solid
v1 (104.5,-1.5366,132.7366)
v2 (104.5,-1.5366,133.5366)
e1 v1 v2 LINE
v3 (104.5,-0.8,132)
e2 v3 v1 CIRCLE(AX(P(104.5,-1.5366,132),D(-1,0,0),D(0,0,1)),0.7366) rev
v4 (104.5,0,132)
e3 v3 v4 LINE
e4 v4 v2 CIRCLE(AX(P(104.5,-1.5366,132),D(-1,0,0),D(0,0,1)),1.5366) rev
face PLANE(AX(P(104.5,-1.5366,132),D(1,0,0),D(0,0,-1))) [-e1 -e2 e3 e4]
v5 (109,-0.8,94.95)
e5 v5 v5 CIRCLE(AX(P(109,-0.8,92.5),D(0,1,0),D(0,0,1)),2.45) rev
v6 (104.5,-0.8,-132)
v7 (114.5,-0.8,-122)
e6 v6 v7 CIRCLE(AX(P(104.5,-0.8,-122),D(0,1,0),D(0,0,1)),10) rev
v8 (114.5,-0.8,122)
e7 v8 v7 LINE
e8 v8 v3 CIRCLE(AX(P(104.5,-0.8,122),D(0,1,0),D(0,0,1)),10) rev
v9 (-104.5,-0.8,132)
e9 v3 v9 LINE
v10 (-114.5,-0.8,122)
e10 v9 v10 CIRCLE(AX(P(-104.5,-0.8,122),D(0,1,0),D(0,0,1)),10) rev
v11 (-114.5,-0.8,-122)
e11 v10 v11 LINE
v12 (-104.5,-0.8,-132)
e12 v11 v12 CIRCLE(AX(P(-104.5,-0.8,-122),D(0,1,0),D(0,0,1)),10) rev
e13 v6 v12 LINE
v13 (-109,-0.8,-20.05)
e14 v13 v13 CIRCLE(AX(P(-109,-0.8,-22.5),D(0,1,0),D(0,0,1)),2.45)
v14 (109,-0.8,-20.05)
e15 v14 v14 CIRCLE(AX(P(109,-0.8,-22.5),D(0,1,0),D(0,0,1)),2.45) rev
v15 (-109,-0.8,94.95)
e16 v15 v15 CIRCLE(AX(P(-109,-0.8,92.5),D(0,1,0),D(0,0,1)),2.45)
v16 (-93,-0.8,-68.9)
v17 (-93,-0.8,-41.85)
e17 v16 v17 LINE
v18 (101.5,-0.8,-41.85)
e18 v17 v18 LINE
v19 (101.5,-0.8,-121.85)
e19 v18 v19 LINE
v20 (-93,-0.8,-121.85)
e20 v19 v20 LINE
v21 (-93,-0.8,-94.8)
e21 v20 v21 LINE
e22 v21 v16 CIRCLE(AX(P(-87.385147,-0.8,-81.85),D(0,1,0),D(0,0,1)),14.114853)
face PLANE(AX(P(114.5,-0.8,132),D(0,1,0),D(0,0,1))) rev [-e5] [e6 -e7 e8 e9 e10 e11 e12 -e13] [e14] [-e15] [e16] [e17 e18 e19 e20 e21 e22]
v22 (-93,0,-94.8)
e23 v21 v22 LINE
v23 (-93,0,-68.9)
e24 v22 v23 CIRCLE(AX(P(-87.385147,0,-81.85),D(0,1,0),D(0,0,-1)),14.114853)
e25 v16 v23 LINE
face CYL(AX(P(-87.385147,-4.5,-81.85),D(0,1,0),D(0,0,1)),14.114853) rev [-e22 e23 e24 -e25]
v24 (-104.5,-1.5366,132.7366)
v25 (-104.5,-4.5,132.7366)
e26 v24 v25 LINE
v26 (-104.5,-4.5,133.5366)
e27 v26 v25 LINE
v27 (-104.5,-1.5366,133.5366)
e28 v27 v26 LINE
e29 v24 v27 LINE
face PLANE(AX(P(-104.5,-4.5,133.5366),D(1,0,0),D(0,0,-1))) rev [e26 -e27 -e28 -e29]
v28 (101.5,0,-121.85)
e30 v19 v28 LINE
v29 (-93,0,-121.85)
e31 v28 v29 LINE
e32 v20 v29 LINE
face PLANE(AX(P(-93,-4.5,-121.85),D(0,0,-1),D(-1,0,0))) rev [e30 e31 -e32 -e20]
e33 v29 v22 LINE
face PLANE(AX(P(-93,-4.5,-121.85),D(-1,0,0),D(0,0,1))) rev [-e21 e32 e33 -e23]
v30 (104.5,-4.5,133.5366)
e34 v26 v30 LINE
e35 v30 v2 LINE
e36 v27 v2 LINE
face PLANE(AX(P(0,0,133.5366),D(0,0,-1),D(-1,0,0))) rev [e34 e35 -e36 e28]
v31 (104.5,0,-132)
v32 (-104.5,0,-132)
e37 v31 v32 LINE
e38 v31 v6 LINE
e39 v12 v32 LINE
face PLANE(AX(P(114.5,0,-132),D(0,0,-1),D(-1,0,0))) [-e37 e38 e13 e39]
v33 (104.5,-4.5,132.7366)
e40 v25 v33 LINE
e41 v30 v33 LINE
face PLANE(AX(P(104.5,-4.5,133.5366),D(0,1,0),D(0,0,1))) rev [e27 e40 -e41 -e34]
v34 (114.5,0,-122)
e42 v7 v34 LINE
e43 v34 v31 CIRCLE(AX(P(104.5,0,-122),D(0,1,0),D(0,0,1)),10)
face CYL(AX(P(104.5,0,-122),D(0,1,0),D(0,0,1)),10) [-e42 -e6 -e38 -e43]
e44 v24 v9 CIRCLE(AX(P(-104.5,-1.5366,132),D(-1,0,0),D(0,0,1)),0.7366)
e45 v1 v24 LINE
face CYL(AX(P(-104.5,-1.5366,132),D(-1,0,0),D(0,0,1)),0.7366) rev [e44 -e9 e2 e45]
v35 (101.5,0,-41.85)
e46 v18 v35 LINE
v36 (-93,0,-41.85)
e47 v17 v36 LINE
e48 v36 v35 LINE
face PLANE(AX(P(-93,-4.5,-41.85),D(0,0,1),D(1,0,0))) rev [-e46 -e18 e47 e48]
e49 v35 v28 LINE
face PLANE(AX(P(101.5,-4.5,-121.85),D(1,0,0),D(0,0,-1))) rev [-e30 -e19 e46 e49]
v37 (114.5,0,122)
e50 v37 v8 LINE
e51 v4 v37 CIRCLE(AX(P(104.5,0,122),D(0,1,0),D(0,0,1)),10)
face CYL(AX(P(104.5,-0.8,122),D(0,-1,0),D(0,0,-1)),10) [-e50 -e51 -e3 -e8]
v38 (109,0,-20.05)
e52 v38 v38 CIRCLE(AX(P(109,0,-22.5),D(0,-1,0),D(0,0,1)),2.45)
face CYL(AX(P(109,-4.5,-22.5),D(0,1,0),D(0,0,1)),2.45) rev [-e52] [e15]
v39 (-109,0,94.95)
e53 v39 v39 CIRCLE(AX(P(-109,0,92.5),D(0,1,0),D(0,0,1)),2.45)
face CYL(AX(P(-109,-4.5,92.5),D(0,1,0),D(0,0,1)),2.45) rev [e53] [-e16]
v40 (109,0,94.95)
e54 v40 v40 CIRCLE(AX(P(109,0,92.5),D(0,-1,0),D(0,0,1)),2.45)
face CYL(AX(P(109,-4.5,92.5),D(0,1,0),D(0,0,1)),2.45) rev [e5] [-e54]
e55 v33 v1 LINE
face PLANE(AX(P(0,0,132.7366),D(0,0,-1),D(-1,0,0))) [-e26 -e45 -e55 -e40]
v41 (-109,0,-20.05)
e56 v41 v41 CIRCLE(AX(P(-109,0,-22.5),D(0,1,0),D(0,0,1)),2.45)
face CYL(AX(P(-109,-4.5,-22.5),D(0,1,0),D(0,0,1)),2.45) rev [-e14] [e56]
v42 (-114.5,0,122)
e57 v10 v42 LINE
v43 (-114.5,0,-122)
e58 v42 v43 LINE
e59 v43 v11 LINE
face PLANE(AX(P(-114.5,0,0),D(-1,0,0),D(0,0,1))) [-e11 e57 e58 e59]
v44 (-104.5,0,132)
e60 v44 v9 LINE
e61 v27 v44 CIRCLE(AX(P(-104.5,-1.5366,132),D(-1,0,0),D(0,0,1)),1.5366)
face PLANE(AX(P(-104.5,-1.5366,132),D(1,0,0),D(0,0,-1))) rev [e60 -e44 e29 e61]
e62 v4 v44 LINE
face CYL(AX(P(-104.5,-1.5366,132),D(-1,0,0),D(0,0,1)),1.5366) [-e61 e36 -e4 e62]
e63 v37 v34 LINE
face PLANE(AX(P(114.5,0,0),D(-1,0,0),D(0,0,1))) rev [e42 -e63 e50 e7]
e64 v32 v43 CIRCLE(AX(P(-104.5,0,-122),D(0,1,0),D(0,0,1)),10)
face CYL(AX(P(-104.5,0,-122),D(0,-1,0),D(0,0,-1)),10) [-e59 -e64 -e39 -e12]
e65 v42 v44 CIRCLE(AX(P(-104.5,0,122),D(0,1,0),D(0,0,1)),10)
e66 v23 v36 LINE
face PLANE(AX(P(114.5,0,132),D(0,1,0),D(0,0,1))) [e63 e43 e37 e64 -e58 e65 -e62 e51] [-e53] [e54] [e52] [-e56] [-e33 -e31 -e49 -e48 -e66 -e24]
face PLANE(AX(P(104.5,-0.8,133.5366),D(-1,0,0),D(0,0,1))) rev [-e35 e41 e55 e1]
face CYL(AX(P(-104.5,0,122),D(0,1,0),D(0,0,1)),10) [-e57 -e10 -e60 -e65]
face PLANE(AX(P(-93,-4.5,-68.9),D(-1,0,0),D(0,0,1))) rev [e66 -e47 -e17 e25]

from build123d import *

# Parameters (mm, degrees)
BASE_FLANGE1_DEPTH      = 114.5
BASE_FLANGE1_DEPTH_BACK = 114.5
SKETCH1_W               = 264
SKETCH1_H               = 0.8
FILLET1_R               = 10
EDGE_FLANGE2_DEPTH      = 209
SKETCH14_R              = 2.45
CUT_EXTRUDE1_DEPTH      = 176.961710436
CUT_EXTRUDE2_DEPTH      = 176.961710436


# Sheet-metal steps are written as plain solids
with BuildPart() as part:
    # Sketch1 → Base-Flange1 (new, two sides: drawn at the far end of the back side and taken through both)
    with BuildSketch(Plane(origin=(0, 0, 0), x_dir=(0, 0, -1), z_dir=(1, 0, 0)).offset(-BASE_FLANGE1_DEPTH_BACK)):
        with Locations((0, -0.4)):
            Rectangle(SKETCH1_W, SKETCH1_H)
    extrude(amount=BASE_FLANGE1_DEPTH + BASE_FLANGE1_DEPTH_BACK)

    # Fillet1
    fillet1_edges = [part.edges().sort_by_distance(p)[0] for p in [
        (-114.5, -0.4, 132),
        (-114.5, -0.4, -132),
        (114.5, -0.4, 132),
        (114.5, -0.4, -132),
    ]]
    fillet(fillet1_edges, radius=FILLET1_R)

    # Edge-Flange2 section (across the edge) → Edge-Flange2 (add)
    with BuildSketch(Plane(origin=(104.5, -0.8, 132.7366), x_dir=(0, 0, -1), z_dir=(-1, 0, 0))):
        with BuildLine():
            Line((-0.8, 0.7366), (-0.8, 3.7))
            Line((-0.8, 3.7), (0, 3.7))
            Line((0, 3.7), (0, 0.7366))
            ThreePointArc((0, 0.7366), (0.215745145, 0.215745145), (0.7366, 0))
            Line((0.7366, 0), (0.7366, -0.8))
            ThreePointArc((0.7366, -0.8), (-0.34994028, -0.34994028), (-0.8, 0.7366))
        make_face()
    extrude(amount=EDGE_FLANGE2_DEPTH)

    # Sketch14 → Cut-Extrude1 (cut, through all)
    with BuildSketch(Plane(origin=(0, 0, 0), x_dir=(1, 0, 0), z_dir=(0, 1, 0))):
        with Locations(Location((-109, -92.5, 0), (0, 0, 270))):
            Circle(SKETCH14_R)
        with Locations(Location((-109, 22.5, 0), (0, 0, 270))):
            Circle(SKETCH14_R)
    cut_extrude1 = extrude(amount=-CUT_EXTRUDE1_DEPTH, mode=Mode.SUBTRACT)

    # Mirror1: Cut-Extrude1 across plane
    add(cut_extrude1.mirror(Plane(origin=(0, 0, 0), x_dir=(0, 0, 1), z_dir=(1, 0, 0))), mode=Mode.SUBTRACT)

    # Sketch15 → Cut-Extrude2 (cut, through all)
    with BuildSketch(Plane(origin=(0, 0, 0), x_dir=(1, 0, 0), z_dir=(0, 1, 0))):
        with BuildLine():
            Line((-93, 121.85), (101.5, 121.85))
            Line((101.5, 121.85), (101.5, 41.85))
            Line((101.5, 41.85), (-93, 41.85))
            Line((-93, 41.85), (-93, 68.9))
            ThreePointArc((-93, 68.9), (-101.5, 81.85), (-93, 94.8))
            Line((-93, 94.8), (-93, 121.85))
        make_face()
    extrude(amount=-CUT_EXTRUDE2_DEPTH, mode=Mode.SUBTRACT)


solid = part.part
